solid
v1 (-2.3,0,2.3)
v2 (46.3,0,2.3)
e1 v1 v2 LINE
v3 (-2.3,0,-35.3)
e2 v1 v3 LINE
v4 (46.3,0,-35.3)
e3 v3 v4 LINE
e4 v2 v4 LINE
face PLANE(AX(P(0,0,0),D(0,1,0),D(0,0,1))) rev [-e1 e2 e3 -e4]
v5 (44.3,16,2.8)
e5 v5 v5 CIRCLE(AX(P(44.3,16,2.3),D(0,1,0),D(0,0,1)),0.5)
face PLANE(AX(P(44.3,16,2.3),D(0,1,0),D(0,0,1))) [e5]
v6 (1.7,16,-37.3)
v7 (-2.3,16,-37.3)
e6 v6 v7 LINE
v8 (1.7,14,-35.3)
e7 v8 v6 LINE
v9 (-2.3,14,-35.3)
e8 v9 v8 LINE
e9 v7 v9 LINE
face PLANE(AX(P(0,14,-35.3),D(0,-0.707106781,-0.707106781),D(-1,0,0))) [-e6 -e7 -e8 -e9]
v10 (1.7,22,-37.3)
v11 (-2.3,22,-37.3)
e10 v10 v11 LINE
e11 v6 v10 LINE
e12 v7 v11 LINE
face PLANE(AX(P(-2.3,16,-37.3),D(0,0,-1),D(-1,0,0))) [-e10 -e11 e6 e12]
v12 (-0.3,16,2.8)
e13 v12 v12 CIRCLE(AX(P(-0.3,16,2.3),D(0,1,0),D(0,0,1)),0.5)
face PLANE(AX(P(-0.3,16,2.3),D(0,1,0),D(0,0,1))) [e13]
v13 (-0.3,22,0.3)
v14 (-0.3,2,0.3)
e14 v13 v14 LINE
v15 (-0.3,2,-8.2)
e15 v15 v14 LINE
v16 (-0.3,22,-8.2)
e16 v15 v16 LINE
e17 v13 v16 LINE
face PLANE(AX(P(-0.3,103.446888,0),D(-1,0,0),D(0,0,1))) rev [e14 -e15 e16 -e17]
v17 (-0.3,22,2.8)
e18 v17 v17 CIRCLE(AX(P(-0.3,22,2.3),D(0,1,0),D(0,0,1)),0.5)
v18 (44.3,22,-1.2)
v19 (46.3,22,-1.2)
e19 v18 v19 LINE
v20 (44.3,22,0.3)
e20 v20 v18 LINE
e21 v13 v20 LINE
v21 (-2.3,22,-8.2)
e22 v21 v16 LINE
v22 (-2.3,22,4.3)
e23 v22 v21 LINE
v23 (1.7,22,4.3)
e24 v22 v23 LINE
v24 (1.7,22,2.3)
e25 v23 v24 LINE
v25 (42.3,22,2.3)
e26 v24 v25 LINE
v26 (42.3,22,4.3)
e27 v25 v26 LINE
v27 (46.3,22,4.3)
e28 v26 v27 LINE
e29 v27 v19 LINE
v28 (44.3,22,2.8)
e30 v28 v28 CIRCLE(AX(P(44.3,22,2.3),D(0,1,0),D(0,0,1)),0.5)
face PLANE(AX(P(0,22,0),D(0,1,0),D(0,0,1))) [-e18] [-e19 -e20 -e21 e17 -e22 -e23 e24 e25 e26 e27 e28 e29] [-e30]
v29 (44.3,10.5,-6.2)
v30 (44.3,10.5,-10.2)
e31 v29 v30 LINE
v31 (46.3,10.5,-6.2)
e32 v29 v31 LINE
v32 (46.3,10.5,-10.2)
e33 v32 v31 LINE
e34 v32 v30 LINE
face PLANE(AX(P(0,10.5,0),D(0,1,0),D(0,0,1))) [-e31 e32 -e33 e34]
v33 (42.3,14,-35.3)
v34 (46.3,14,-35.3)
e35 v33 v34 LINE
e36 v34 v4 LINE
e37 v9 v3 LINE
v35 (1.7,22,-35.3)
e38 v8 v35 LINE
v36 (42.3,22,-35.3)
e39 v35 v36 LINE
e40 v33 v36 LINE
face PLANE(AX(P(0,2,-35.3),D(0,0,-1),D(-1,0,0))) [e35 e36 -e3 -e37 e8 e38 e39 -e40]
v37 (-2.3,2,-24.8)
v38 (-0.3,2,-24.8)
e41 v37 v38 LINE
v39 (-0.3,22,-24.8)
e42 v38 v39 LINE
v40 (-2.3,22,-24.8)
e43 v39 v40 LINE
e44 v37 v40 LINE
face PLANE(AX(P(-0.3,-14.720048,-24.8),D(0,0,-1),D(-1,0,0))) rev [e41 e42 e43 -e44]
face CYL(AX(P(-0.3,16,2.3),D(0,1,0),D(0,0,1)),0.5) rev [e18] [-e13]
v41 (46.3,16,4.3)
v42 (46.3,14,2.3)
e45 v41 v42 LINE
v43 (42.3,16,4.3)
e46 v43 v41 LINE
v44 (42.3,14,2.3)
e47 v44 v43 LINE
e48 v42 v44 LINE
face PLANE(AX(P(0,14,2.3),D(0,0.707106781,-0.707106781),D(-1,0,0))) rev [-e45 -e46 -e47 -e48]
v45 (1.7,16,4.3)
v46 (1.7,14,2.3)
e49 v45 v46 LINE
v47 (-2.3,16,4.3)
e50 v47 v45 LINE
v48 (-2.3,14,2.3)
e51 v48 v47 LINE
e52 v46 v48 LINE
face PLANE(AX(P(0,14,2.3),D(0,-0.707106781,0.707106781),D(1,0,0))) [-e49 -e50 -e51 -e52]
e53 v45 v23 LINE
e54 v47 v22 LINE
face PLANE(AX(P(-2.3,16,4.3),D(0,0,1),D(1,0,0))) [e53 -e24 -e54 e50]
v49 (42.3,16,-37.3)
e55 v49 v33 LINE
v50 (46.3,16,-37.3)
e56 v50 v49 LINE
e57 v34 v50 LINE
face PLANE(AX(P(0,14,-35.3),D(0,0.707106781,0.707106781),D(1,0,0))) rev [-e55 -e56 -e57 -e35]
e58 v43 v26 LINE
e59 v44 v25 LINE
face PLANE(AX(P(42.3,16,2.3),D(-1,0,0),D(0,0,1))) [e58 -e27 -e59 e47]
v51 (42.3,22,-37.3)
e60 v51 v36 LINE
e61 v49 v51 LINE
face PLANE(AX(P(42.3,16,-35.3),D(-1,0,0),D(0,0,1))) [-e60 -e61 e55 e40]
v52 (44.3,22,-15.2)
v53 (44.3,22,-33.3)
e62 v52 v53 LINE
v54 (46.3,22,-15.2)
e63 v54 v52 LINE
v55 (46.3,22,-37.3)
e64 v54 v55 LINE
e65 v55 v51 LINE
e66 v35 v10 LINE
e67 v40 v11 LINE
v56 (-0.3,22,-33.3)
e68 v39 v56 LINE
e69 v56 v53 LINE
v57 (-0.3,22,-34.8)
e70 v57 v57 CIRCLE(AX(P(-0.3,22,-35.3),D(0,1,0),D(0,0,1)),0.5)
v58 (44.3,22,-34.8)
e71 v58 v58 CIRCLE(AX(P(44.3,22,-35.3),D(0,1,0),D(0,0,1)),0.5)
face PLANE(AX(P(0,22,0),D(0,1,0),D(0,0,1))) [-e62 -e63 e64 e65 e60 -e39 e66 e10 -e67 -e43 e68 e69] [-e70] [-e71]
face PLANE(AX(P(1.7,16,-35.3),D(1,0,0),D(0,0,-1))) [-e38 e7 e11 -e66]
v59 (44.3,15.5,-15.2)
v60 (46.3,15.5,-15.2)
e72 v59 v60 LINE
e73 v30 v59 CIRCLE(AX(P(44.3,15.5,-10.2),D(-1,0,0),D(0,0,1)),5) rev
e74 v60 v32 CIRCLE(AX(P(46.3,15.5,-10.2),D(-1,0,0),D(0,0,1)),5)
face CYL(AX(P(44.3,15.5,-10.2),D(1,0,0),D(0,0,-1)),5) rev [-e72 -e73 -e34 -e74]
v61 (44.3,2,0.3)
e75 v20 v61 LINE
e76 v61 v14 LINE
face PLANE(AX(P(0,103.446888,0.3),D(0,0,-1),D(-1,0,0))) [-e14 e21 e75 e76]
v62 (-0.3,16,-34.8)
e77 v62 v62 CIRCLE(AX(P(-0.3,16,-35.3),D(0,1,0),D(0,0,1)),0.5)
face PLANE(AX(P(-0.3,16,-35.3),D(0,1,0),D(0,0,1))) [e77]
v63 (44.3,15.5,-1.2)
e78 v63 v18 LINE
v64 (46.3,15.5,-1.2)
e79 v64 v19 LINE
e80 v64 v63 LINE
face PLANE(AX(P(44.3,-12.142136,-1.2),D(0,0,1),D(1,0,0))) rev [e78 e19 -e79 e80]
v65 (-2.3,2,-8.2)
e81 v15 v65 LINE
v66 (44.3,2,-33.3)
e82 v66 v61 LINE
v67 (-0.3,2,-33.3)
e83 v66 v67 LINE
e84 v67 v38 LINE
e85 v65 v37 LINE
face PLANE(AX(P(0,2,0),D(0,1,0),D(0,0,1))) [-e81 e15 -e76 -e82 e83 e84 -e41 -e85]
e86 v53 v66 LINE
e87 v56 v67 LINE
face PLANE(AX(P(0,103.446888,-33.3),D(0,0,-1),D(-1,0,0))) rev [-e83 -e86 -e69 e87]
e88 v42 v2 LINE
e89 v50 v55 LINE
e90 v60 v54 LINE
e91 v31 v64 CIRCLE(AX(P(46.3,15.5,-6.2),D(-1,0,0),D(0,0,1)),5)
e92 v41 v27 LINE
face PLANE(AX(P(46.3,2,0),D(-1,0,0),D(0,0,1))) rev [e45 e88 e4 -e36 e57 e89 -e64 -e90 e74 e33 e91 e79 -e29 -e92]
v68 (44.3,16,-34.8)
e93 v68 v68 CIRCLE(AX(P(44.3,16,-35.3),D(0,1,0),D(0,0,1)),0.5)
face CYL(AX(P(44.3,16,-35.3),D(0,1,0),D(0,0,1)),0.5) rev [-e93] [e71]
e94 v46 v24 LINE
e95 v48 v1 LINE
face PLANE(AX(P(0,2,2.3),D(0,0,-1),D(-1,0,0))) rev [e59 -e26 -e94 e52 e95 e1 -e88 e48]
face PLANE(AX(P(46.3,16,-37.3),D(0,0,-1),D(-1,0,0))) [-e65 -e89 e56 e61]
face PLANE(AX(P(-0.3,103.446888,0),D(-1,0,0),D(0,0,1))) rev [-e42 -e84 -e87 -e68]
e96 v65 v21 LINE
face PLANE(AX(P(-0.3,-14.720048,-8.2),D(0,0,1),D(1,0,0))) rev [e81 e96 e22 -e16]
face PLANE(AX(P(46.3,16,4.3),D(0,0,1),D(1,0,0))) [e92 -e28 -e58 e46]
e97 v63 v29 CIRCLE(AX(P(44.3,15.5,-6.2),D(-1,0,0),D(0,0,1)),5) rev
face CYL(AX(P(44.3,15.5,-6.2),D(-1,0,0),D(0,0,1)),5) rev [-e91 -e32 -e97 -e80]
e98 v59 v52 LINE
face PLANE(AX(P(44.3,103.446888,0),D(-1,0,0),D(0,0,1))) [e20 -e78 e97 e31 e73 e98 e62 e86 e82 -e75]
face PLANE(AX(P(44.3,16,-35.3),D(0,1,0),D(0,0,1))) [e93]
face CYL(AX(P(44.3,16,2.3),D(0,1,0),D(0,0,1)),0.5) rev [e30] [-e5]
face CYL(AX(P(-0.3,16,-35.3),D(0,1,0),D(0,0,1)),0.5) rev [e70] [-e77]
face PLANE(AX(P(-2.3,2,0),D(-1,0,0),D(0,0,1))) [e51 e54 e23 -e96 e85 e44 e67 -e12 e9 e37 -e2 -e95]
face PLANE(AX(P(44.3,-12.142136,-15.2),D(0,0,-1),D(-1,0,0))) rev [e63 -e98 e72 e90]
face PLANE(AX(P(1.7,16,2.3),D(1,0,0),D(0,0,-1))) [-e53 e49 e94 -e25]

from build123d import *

# Parameters (mm, degrees)
SKETCH1_W           = 48.6
SKETCH1_H           = 37.6
SKETCH1_W_2         = 44.6
SKETCH1_H_2         = 33.6
SKETCH1_W_3         = 44
SKETCH1_H_3         = 33
BOSS_EXTRUDE1_DEPTH = 2
SKETCH1_3_W         = 48.6
SKETCH1_3_H         = 37.6
SKETCH1_3_W_2       = 44.6
SKETCH1_3_H_2       = 33.6
BOSS_EXTRUDE2_DEPTH = 22
SKETCH2_W           = 2
SKETCH2_H           = 16.6
CUT_EXTRUDE1_DEPTH  = 20
SKETCH3_W           = 2
SKETCH3_H           = 14
CUT_EXTRUDE2_DEPTH  = 11.5
FILLET1_R           = 5
SKETCH4_W           = 4
SKETCH4_H           = 2
BOSS_EXTRUDE3_DEPTH = 6
CHAMFER1_SIZE       = 2
SKETCH5_R           = 0.5
CUT_EXTRUDE4_DEPTH  = 6


with BuildPart() as part:
    # Sketch1 → Boss-Extrude1 (new body)
    # profile 1 of 3: a face of its own
    with BuildSketch(Plane(origin=(0, 0, 0), x_dir=(1, 0, 0), z_dir=(0, 1, 0))):
        with Locations((22, 16.5)):
            Rectangle(SKETCH1_W, SKETCH1_H)
        with Locations((22, 16.5)):
            Rectangle(SKETCH1_W_2, SKETCH1_H_2, mode=Mode.SUBTRACT)
    # profile 2 of 3: a face of its own
    with BuildSketch(Plane(origin=(0, 0, 0), x_dir=(1, 0, 0), z_dir=(0, 1, 0))):
        with Locations((22, 16.5)):
            Rectangle(SKETCH1_W_2, SKETCH1_H_2)
        with Locations((22, 16.5)):
            Rectangle(SKETCH1_W_3, SKETCH1_H_3, mode=Mode.SUBTRACT)
    # profile 3 of 3: a face of its own
    with BuildSketch(Plane(origin=(0, 0, 0), x_dir=(1, 0, 0), z_dir=(0, 1, 0))):
        with Locations((22, 16.5)):
            Rectangle(SKETCH1_W_3, SKETCH1_H_3)
    extrude(amount=BOSS_EXTRUDE1_DEPTH)

    # Sketch1<3> → Boss-Extrude2 (add)
    with BuildSketch(Plane(origin=(0, 0, 0), x_dir=(1, 0, 0), z_dir=(0, 1, 0))):
        with Locations((22, 16.5)):
            Rectangle(SKETCH1_3_W, SKETCH1_3_H)
        with Locations((22, 16.5)):
            Rectangle(SKETCH1_3_W_2, SKETCH1_3_H_2, mode=Mode.SUBTRACT)
    extrude(amount=BOSS_EXTRUDE2_DEPTH)

    # Sketch2 → Cut-Extrude1 (cut)
    with BuildSketch(Plane(origin=(0, 22, 0), x_dir=(1, 0, 0), z_dir=(0, 1, 0))):
        with Locations((-1.3, 16.5)):
            Rectangle(SKETCH2_W, SKETCH2_H)
    extrude(amount=-CUT_EXTRUDE1_DEPTH, mode=Mode.SUBTRACT)

    # Sketch3 → Cut-Extrude2 (cut)
    with BuildSketch(Plane(origin=(0, 22, 0), x_dir=(1, 0, 0), z_dir=(0, 1, 0))):
        with Locations((45.3, 8.2)):
            Rectangle(SKETCH3_W, SKETCH3_H)
    extrude(amount=-CUT_EXTRUDE2_DEPTH, mode=Mode.SUBTRACT)

    # Fillet1
    fillet1_edges = [part.edges().sort_by_distance(p)[0] for p in [
        (45.3, 10.5, -15.2),
        (45.3, 10.5, -1.2),
    ]]
    fillet(fillet1_edges, radius=FILLET1_R)

    # Sketch4 → Boss-Extrude3 (add)
    with BuildSketch(Plane(origin=(0, 22, 0), x_dir=(1, 0, 0), z_dir=(0, 1, 0))):
        with Locations((44.3, -3.3)):
            Rectangle(SKETCH4_W, SKETCH4_H)
        with Locations((-0.3, -3.3)):
            Rectangle(SKETCH4_W, SKETCH4_H)
        with Locations((-0.3, 36.3)):
            Rectangle(SKETCH4_W, SKETCH4_H)
        with Locations((44.3, 36.3)):
            Rectangle(SKETCH4_W, SKETCH4_H)
    extrude(amount=-BOSS_EXTRUDE3_DEPTH)

    # Chamfer1
    chamfer1_edges = [part.edges().sort_by_distance(p)[0] for p in [
        (-0.3, 16, 2.3),
        (44.3, 16, 2.3),
        (-0.3, 16, -35.3),
        (44.3, 16, -35.3),
    ]]
    chamfer(chamfer1_edges, length=CHAMFER1_SIZE - 0.0001)  # a hair under: the kernel refuses the full size

    # Sketch5 → Cut-Extrude4 (cut)
    with BuildSketch(Plane(origin=(0, 22, 0), x_dir=(1, 0, 0), z_dir=(0, 1, 0))):
        with Locations(Location((44.3, -2.3, 0), (0, 0, 270))):
            Circle(SKETCH5_R)
        with Locations(Location((-0.3, -2.3, 0), (0, 0, 270))):
            Circle(SKETCH5_R)
        with Locations(Location((-0.3, 35.3, 0), (0, 0, 270))):
            Circle(SKETCH5_R)
        with Locations(Location((44.3, 35.3, 0), (0, 0, 270))):
            Circle(SKETCH5_R)
    extrude(amount=-CUT_EXTRUDE4_DEPTH, mode=Mode.SUBTRACT)


solid = part.part
